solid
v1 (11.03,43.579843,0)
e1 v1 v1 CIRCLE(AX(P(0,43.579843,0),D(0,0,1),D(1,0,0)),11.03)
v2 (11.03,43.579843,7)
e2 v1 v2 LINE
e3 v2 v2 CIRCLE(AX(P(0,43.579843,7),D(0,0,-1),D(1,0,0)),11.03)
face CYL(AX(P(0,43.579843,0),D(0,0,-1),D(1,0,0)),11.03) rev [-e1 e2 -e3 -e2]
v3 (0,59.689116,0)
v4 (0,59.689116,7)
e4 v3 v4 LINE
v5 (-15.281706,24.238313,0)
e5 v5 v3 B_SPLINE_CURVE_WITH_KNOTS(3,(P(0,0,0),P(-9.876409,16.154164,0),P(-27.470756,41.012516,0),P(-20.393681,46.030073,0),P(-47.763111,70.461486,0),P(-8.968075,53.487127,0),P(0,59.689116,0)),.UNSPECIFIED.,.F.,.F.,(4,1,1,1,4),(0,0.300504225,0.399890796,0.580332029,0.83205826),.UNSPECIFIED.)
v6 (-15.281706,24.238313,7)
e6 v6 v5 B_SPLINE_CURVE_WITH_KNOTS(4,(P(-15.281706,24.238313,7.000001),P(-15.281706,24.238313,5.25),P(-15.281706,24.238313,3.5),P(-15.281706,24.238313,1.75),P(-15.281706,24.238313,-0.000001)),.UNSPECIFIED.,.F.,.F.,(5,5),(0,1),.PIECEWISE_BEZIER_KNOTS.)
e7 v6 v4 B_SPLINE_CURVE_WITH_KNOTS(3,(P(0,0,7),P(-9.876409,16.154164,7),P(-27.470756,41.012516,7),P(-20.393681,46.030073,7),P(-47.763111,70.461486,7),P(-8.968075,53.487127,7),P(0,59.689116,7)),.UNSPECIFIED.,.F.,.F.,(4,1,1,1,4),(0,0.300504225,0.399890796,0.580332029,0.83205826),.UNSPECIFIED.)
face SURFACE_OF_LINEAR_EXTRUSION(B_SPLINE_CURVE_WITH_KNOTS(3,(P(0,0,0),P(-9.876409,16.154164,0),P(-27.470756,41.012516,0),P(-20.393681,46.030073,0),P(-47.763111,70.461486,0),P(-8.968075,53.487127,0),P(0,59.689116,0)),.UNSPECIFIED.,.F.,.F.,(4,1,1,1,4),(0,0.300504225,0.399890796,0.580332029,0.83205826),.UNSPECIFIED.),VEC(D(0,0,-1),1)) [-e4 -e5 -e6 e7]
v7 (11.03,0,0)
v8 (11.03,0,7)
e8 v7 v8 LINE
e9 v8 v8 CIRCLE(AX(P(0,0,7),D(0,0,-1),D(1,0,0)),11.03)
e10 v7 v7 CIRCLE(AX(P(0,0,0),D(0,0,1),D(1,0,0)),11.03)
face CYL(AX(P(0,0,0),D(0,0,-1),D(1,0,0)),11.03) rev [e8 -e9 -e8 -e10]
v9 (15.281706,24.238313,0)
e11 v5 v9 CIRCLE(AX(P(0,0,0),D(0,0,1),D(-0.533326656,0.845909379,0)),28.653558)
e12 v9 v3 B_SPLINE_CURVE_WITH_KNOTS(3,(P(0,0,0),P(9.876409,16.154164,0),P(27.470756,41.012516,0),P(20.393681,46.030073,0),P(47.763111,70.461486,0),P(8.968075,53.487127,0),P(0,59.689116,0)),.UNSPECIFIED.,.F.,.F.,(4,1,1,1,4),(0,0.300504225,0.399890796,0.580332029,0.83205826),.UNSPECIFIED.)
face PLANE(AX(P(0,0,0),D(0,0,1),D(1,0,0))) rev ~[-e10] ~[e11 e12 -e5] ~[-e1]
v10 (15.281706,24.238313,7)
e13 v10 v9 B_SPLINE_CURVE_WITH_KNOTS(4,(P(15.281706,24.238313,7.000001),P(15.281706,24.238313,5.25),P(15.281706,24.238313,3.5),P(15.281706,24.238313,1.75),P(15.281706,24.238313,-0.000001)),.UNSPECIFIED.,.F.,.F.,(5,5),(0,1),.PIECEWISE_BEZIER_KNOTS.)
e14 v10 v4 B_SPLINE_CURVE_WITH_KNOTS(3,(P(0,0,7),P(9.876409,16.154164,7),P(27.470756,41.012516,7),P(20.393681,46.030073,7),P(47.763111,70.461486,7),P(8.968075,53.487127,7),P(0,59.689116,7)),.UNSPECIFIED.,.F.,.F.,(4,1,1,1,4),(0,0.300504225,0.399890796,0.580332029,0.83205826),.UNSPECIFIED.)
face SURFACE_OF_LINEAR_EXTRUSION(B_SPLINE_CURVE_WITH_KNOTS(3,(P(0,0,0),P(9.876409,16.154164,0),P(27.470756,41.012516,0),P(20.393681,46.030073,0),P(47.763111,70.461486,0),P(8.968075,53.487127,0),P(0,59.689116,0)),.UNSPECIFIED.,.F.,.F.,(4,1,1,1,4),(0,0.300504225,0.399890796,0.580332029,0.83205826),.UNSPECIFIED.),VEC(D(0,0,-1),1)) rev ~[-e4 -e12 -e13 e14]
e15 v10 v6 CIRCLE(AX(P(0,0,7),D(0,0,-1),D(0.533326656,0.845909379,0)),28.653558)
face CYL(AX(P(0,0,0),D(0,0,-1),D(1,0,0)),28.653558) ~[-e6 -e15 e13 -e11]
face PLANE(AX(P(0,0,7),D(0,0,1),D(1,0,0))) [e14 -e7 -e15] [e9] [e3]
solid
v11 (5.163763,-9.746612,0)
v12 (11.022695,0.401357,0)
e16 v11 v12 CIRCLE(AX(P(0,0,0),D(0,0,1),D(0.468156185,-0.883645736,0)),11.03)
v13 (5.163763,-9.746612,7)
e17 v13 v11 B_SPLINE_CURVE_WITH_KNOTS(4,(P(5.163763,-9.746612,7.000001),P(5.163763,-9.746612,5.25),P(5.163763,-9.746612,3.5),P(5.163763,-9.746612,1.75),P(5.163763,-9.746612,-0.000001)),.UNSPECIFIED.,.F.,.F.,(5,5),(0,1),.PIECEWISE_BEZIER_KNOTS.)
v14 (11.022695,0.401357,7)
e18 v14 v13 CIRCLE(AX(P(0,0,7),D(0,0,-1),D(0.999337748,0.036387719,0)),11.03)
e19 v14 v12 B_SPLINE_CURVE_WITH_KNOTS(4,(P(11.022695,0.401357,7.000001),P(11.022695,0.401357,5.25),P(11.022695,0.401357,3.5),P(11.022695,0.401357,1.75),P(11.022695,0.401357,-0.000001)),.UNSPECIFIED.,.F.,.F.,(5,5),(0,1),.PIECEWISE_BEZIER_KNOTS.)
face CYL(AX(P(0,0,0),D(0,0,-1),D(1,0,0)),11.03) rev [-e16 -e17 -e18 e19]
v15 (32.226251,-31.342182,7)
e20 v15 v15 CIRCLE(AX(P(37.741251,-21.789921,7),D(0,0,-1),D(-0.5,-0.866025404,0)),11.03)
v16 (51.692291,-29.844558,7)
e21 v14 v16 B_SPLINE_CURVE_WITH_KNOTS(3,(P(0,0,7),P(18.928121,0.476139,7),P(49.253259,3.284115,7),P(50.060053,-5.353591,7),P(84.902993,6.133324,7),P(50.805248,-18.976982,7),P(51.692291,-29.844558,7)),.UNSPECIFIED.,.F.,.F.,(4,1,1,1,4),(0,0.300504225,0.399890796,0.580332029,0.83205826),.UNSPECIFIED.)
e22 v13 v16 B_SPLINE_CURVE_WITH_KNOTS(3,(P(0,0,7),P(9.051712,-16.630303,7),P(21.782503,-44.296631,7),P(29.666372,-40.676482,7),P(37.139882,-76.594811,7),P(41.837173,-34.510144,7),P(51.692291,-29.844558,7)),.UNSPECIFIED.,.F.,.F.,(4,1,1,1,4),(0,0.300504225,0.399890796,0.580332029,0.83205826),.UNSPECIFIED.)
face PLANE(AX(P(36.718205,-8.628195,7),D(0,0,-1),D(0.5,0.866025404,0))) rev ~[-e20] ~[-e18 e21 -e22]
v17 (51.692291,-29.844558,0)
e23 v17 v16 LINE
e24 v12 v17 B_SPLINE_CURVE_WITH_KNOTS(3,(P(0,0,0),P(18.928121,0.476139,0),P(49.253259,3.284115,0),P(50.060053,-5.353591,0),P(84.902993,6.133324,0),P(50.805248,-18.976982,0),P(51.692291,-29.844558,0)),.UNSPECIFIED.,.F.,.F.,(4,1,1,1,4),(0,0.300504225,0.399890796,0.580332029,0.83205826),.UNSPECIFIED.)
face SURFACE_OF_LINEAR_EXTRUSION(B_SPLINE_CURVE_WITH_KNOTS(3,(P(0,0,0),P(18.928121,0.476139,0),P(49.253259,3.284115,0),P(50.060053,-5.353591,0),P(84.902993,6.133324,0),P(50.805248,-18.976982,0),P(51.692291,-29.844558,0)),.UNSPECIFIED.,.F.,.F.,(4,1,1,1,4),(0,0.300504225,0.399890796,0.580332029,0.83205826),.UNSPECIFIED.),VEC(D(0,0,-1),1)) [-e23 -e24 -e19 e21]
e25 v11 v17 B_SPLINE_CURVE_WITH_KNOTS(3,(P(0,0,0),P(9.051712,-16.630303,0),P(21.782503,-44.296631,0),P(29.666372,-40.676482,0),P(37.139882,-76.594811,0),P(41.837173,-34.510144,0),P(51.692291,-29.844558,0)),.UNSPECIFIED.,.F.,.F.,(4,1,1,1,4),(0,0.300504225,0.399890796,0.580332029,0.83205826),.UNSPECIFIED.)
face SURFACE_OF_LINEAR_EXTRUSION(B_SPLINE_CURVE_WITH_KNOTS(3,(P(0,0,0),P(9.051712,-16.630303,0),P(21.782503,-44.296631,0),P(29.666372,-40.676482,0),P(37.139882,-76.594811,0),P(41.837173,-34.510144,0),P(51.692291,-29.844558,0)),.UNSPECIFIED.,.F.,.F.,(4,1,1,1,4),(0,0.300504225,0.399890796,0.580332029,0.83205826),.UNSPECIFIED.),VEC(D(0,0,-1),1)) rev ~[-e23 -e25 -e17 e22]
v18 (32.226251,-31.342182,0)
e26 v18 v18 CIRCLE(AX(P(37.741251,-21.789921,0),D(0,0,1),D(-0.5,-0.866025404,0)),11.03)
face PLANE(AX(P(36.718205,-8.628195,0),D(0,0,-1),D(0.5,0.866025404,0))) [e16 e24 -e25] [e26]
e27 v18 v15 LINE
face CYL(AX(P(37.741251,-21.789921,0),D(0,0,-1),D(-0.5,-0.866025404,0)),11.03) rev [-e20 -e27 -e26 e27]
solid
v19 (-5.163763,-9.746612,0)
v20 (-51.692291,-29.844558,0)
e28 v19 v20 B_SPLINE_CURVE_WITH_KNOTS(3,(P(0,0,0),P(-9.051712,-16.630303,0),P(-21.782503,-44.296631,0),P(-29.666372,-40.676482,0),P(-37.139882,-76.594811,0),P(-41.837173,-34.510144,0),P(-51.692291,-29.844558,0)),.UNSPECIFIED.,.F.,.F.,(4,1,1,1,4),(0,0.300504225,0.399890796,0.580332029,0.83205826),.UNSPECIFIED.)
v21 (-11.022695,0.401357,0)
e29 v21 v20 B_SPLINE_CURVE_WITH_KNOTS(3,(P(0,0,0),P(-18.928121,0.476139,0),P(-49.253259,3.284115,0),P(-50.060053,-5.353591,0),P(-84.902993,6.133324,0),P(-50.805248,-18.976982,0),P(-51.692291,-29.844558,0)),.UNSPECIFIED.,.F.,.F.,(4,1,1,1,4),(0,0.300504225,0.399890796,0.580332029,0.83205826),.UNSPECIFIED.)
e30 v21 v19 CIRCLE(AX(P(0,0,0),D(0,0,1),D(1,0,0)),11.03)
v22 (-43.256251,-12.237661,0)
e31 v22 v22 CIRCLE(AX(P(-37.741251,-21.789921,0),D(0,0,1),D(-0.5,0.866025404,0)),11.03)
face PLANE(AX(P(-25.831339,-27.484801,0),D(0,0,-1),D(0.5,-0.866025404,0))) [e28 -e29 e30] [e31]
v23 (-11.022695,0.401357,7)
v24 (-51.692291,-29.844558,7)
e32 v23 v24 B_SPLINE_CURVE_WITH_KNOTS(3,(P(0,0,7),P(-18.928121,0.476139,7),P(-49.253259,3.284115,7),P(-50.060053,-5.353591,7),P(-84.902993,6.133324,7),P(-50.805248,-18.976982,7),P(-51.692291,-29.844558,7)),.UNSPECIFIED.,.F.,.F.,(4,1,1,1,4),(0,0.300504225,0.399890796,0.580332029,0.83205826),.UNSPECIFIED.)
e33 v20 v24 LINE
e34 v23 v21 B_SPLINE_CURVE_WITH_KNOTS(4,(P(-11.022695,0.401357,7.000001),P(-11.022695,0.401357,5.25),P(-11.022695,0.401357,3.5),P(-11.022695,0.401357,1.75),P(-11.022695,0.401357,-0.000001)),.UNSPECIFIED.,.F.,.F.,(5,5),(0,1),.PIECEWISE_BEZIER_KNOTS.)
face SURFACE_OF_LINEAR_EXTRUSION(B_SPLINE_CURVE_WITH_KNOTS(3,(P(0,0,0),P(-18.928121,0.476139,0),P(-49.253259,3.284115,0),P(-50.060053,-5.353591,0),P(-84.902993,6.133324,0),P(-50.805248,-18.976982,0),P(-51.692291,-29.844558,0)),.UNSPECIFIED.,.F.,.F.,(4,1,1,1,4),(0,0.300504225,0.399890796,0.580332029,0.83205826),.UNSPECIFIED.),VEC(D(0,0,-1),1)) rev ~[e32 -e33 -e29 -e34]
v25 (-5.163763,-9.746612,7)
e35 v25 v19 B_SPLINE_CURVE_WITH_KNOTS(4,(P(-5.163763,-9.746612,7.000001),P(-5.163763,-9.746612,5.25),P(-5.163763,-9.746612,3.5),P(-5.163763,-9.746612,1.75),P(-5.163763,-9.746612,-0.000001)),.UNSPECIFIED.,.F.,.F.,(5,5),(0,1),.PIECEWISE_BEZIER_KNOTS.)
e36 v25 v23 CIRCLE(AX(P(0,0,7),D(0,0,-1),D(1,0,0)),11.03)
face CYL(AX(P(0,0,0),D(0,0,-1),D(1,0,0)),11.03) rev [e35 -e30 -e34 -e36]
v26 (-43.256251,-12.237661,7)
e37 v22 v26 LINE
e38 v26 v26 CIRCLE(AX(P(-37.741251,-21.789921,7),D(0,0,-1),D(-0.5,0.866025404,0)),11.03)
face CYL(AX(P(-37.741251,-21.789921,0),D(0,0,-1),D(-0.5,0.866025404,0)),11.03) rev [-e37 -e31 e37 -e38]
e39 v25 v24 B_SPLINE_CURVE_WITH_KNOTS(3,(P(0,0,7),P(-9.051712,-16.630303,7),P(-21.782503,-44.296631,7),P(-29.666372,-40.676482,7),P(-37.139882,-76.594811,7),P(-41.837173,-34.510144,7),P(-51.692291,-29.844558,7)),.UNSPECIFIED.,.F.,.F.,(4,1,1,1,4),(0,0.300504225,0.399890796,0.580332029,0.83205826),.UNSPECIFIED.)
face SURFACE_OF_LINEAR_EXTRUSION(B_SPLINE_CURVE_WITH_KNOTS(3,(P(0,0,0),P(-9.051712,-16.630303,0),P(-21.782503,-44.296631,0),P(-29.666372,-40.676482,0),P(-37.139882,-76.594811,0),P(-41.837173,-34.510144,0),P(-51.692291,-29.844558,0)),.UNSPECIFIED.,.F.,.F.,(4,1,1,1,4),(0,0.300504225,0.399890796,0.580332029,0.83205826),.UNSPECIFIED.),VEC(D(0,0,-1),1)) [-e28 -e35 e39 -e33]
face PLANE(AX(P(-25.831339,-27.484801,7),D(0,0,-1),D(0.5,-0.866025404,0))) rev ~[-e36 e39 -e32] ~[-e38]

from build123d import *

# Parameters (mm, degrees)
F2_DEPTH = 7
F0_R     = 11.03
F3_DEPTH = 45.6
F4_COUNT = 3
F5_R     = 28.6535577474
F6_DEPTH = 7
F7_DEPTH = 25


with BuildPart() as f2:
    # F1 (on Top) → F2 (new body)
    with BuildSketch(Plane.XY):
        with BuildLine():
            add(Edge.make_bspline(
                [(0, 0), (-9.8764091539, 16.1541642436), (-27.4707564343, 41.0125164581), (-20.3936808927, 46.0300729048), (-47.763111083, 70.4614863935), (-8.9680751782, 53.4871265852), (0, 59.6891157329)],
                knots=[0, 0, 0, 0, 0.300504225, 0.3998907963, 0.5803320288, 0.8320582597, 0.8320582597, 0.8320582597, 0.8320582597], degree=3))
            Line((0, 0), (0, 59.6891157329))
        make_face()
        with BuildLine():
            Line((0, 59.6891157329), (0, 0))
            add(Edge.make_bspline(
                [(0, 0), (9.8764091539, 16.1541642436), (27.4707564343, 41.0125164581), (20.3936808927, 46.0300729048), (47.763111083, 70.4614863935), (8.9680751782, 53.4871265852), (0, 59.6891157329)],
                knots=[0, 0, 0, 0, 0.300504225, 0.3998907963, 0.5803320288, 0.8320582597, 0.8320582597, 0.8320582597, 0.8320582597], degree=3))
        make_face()
    extrude(amount=F2_DEPTH)

    # F0 (on Top) → F3 (cut)
    with BuildSketch(Plane.XY):
        with Locations((0, 43.5798426213)):
            Circle(F0_R)
    extrude(amount=F3_DEPTH, mode=Mode.SUBTRACT)


with BuildPart() as f4_1:
    # F4: instance of F2
    add(f2.part.rotate(Axis((0, 0, 3.5), (0, 0, -1)), 1 * 360 / F4_COUNT))


with BuildPart() as f4_2:
    # F4: instance of F2
    add(f2.part.rotate(Axis((0, 0, 3.5), (0, 0, -1)), 2 * 360 / F4_COUNT))


with BuildPart() as f2_1:
    add(f2.part)

    # F5 (on Top) → F6 (join)
    with BuildSketch(Plane.XY):
        Circle(F5_R)
    extrude(amount=F6_DEPTH)


with BuildPart() as f7_tool:
    # F0 (on Top) → F7 (new body)
    with BuildSketch(Plane.XY):
        Circle(F0_R)
    extrude(amount=F7_DEPTH)


with BuildPart() as f2_2:
    add(f2_1.part)

    # F7: cut by f7_tool
    add(f7_tool.part, mode=Mode.SUBTRACT)


with BuildPart() as f4_1_1:
    add(f4_1.part)

    # F7: cut by f7_tool
    add(f7_tool.part, mode=Mode.SUBTRACT)


with BuildPart() as f4_2_1:
    add(f4_2.part)

    # F7: cut by f7_tool
    add(f7_tool.part, mode=Mode.SUBTRACT)


solid = Compound([f2_2.part, f4_1_1.part, f4_2_1.part])
